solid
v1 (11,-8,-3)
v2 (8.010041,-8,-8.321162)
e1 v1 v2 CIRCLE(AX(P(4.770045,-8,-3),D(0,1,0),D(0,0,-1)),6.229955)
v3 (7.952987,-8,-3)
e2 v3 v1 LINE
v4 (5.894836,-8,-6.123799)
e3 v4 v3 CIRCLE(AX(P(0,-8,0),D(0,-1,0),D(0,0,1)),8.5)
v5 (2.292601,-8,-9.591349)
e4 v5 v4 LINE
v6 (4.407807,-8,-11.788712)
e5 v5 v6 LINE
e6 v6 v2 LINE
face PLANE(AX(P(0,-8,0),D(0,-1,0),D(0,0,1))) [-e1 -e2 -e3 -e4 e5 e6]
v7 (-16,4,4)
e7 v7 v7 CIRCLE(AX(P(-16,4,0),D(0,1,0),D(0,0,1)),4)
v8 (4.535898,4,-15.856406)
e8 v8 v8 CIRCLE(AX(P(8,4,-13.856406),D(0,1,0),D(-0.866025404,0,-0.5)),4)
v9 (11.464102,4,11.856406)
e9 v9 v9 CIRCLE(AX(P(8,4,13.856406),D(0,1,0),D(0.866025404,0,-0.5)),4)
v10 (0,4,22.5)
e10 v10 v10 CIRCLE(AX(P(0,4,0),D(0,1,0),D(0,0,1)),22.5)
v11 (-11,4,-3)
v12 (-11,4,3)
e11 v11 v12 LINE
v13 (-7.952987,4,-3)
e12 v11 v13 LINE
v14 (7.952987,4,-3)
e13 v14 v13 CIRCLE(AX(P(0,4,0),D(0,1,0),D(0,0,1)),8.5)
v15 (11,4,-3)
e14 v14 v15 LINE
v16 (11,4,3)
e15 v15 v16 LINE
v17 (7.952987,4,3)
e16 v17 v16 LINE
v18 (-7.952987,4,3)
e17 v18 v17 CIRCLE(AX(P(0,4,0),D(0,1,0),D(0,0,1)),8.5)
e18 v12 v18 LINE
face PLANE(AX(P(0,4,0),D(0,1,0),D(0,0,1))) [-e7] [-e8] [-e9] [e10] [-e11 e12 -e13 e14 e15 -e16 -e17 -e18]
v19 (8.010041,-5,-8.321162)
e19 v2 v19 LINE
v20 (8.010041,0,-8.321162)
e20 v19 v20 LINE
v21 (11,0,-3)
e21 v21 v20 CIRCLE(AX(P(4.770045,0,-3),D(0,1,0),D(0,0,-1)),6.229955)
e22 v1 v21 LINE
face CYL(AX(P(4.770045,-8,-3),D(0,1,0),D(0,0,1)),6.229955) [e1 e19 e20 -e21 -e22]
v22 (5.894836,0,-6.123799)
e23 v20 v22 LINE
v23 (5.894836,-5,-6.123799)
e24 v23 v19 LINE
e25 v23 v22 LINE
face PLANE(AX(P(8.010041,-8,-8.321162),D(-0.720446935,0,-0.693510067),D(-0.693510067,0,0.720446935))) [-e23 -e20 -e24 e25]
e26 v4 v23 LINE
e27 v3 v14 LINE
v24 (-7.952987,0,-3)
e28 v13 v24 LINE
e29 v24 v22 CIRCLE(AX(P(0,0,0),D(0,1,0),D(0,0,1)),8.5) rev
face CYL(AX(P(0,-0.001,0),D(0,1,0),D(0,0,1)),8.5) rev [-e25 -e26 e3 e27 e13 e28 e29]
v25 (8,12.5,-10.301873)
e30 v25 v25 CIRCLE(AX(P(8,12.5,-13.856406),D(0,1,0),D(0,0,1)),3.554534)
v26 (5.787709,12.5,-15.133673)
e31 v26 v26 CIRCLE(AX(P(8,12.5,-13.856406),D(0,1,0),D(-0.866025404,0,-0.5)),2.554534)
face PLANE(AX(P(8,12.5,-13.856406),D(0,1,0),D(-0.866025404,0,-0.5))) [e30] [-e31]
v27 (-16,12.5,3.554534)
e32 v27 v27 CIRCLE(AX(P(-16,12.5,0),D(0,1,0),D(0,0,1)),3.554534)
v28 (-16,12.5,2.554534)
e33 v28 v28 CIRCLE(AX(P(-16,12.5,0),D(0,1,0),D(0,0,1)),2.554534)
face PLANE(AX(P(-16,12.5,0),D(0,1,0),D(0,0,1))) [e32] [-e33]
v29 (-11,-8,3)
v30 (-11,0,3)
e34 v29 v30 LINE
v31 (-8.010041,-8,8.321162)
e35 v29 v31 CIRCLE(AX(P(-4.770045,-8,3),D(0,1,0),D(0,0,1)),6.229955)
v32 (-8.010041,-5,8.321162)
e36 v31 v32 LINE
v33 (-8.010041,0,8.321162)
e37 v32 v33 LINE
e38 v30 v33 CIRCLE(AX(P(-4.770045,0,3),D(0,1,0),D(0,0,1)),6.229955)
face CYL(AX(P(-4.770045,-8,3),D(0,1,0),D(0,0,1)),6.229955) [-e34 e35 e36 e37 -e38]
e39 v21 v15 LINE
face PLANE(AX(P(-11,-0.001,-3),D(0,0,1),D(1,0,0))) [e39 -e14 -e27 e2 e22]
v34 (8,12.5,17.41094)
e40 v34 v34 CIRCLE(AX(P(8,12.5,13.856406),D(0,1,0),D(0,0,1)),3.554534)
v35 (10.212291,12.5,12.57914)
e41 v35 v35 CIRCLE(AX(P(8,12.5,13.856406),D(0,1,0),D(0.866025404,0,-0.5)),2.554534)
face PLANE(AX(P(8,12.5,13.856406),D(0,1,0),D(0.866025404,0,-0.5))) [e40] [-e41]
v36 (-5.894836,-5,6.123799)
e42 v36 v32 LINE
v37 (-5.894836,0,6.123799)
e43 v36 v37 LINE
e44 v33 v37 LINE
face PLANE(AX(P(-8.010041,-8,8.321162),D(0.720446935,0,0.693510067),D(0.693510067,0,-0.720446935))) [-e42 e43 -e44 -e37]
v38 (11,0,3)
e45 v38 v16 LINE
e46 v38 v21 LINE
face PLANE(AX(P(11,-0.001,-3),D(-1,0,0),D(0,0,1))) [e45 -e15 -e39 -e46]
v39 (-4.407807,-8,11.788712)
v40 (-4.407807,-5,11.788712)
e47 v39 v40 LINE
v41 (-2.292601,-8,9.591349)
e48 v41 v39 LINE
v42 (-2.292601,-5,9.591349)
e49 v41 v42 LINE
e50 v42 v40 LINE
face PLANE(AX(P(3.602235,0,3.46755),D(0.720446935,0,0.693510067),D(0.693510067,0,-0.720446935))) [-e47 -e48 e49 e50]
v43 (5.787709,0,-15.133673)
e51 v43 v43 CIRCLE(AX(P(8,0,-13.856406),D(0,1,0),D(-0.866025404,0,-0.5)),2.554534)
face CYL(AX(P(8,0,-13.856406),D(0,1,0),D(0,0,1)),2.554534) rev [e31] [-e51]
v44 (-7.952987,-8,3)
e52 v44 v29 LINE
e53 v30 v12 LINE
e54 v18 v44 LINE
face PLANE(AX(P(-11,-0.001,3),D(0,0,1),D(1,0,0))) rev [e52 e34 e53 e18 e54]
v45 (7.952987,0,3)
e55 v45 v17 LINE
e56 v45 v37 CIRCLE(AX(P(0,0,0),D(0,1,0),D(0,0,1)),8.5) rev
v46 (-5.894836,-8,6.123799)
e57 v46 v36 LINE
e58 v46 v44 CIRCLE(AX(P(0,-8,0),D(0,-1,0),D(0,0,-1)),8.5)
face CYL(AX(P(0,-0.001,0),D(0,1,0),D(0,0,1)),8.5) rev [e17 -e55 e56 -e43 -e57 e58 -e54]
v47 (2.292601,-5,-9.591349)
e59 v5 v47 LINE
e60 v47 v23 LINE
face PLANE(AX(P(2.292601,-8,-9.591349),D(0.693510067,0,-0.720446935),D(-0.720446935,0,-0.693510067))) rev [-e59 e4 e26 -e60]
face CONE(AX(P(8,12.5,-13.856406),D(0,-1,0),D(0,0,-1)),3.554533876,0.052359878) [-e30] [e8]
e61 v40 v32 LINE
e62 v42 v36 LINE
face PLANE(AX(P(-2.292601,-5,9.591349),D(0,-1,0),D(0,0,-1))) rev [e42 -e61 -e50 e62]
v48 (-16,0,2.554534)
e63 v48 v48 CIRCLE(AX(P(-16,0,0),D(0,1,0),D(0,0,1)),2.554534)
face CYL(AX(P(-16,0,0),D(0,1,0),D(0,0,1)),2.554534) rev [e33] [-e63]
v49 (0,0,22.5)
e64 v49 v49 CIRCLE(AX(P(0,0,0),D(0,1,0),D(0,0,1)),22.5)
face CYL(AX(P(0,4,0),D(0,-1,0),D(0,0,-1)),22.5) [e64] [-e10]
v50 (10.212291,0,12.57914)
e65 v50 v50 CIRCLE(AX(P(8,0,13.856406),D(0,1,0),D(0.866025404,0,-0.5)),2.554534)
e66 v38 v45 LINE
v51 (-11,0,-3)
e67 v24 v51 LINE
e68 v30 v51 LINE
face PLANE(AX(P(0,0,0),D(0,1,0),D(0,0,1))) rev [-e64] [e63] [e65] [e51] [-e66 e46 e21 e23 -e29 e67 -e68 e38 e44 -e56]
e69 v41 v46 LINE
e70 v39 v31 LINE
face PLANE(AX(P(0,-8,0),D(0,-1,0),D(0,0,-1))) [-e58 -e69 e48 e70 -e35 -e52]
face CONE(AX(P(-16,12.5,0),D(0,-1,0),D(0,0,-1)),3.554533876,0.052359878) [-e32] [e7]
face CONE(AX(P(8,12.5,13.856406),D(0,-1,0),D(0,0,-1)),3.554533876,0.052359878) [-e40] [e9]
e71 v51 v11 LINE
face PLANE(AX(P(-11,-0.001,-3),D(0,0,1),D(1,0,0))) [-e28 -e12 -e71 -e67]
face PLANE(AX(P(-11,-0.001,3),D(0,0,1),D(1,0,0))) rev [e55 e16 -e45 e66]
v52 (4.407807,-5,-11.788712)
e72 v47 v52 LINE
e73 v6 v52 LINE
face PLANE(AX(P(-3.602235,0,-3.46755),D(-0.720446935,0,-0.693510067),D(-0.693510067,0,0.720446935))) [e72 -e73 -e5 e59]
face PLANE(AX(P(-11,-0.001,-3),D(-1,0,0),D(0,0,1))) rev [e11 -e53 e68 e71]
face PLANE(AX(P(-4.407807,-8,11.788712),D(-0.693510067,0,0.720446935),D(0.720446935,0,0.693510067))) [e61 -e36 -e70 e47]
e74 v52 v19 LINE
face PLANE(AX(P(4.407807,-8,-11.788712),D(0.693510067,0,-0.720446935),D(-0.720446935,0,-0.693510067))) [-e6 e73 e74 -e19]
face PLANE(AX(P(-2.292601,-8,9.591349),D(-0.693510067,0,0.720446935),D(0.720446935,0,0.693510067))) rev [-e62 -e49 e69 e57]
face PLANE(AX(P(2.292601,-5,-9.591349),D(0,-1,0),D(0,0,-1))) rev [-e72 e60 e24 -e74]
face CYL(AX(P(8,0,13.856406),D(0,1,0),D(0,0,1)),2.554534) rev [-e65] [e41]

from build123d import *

# Parameters (mm, degrees)
ESQUISSE1_R                                 = 22.5
BOSS_EXTRU_1_DEPTH                          = 4
ESQUISSE2_R                                 = 4
BOSS_EXTRU_3_DEPTH                          = 8.5
CHANFREIN1_SIZE                             = 8.5
CHANFREIN1_SIZE_2                           = 0.445466124
ESQUISSE4_R                                 = 2.554533876
ENL_V_MAT_EXTRU_1_DEPTH                     = 35.186985828
R_P_TITION_CIRCULAIRE1_COUNT                = 3
CHANFREIN1_OF_R_P_TITION_CIRCULAIRE1_SIZE   = 8.5
CHANFREIN1_OF_R_P_TITION_CIRCULAIRE1_SIZE_2 = 0.445466124
ENL_V_MAT_EXTRU_2_REACH                     = 34.936
ESQUISSE5_R                                 = 8.5
ENL_V_START                                 = -4
ESQUISSE6_W                                 = 22
ESQUISSE6_H                                 = 6
ENL_V_MAT_EXTRU_4_DEPTH                     = 4
BOSS_EXTRU_5_DEPTH                          = 8
ESQUISSE8_W                                 = 3.05
ESQUISSE8_H                                 = 3
BOSS_EXTRU_6_DEPTH                          = 5
R_P_TITION_CIRCULAIRE3_COUNT                = 2


with BuildPart() as part:
    # Esquisse1 → Boss.-Extru.1 (new body)
    with BuildSketch(Plane(origin=(0, 0, 0), x_dir=(1, 0, 0), z_dir=(0, 1, 0))):
        with Locations(Location((0, 0, 0), (0, 0, 270))):
            Circle(ESQUISSE1_R)
    extrude(amount=BOSS_EXTRU_1_DEPTH)

    # Esquisse2 → Boss.-Extru.3 (add)
    with BuildSketch(Plane(origin=(0, 4, 0), x_dir=(1, 0, 0), z_dir=(0, 1, 0))):
        with Locations(Location((-16, 0, 0), (0, 0, 270))):
            Circle(ESQUISSE2_R)
    boss_extru_3 = extrude(amount=BOSS_EXTRU_3_DEPTH)

    # Chanfrein1
    # the kernel refuses this chamfer: 8.5, 0.445466124 mm, written as the material it takes off along each edge
    with BuildSketch(Plane(origin=(-16, 12.5, 0), x_dir=(0, 0, 1), z_dir=(-1, 0, 0))) as chanfrein1_piece_1_section:
        Polygon((4, -CHANFREIN1_SIZE), (4 - CHANFREIN1_SIZE_2, 0), (4, 0), align=None)
    chanfrein1_piece_1 = revolve(axis=Axis((-16, 12.5, 0), (0, 1, 0)), mode=Mode.PRIVATE)
    chanfrein1_piece_1 = split(chanfrein1_piece_1, bisect_by=Plane(origin=(-16, 4, -3.812448858), z_dir=(0, 1, 0)), keep=Keep.TOP, mode=Mode.PRIVATE)
    add(chanfrein1_piece_1, mode=Mode.SUBTRACT)

    # Esquisse4 → Enlèv. mat.-Extru.1 (cut, through all)
    with BuildSketch(Plane(origin=(0, 12.5, 0), x_dir=(1, 0, 0), z_dir=(0, 1, 0))):
        with Locations(Location((-16, 0, 0), (0, 0, 270))):
            Circle(ESQUISSE4_R)
    enl_v_mat_extru_1 = extrude(amount=-ENL_V_MAT_EXTRU_1_DEPTH, mode=Mode.SUBTRACT)

    # Répétition circulaire1: Boss.-Extru.3, Enlèv. mat.-Extru.1 ×3 about axis
    r_p_tition_circulaire1_axis = Axis((0, 0, 0), (0, 1, 0))
    add([boss_extru_3.rotate(r_p_tition_circulaire1_axis, i * 360 / R_P_TITION_CIRCULAIRE1_COUNT) for i in range(1, R_P_TITION_CIRCULAIRE1_COUNT)])
    add([enl_v_mat_extru_1.rotate(r_p_tition_circulaire1_axis, i * 360 / R_P_TITION_CIRCULAIRE1_COUNT) for i in range(1, R_P_TITION_CIRCULAIRE1_COUNT)], mode=Mode.SUBTRACT)

    # Chanfrein1 of Répétition circulaire1
    # the kernel refuses this chamfer: 8.5, 0.445466124 mm, written as the material it takes off along each edge
    with BuildSketch(Plane(origin=(8, 12.5, 13.856406461), x_dir=(0.8660254037844387, 0, -0.5000000000000001), z_dir=(0.5000000000000001, 0, 0.8660254037844387))) as chanfrein1_of_r_p_tition_circulaire1_piece_1_section:
        Polygon((4, -CHANFREIN1_OF_R_P_TITION_CIRCULAIRE1_SIZE), (4 - CHANFREIN1_OF_R_P_TITION_CIRCULAIRE1_SIZE_2, 0), (4, 0), align=None)
    chanfrein1_of_r_p_tition_circulaire1_piece_1 = revolve(axis=Axis((8, 12.5, 13.856406461), (0, 1, 0)), mode=Mode.PRIVATE)
    chanfrein1_of_r_p_tition_circulaire1_piece_1 = split(chanfrein1_of_r_p_tition_circulaire1_piece_1, bisect_by=Plane(origin=(4.698322438, 4, 15.762630889), z_dir=(0, 1, 0)), keep=Keep.TOP, mode=Mode.PRIVATE)
    add(chanfrein1_of_r_p_tition_circulaire1_piece_1, mode=Mode.SUBTRACT)
    with BuildSketch(Plane(origin=(8, 12.5, -13.856406461), x_dir=(-0.8660254037844384, 0, -0.5000000000000003), z_dir=(0.5000000000000003, 0, -0.8660254037844384))) as chanfrein1_of_r_p_tition_circulaire1_piece_2_section:
        Polygon((4, -CHANFREIN1_OF_R_P_TITION_CIRCULAIRE1_SIZE), (4 - CHANFREIN1_OF_R_P_TITION_CIRCULAIRE1_SIZE_2, 0), (4, 0), align=None)
    chanfrein1_of_r_p_tition_circulaire1_piece_2 = revolve(axis=Axis((8, 12.5, -13.856406461), (0, 1, 0)), mode=Mode.PRIVATE)
    chanfrein1_of_r_p_tition_circulaire1_piece_2 = split(chanfrein1_of_r_p_tition_circulaire1_piece_2, bisect_by=Plane(origin=(11.301677562, 4, -11.950182032), z_dir=(0, 1, 0)), keep=Keep.TOP, mode=Mode.PRIVATE)
    add(chanfrein1_of_r_p_tition_circulaire1_piece_2, mode=Mode.SUBTRACT)

    # Esquisse5 → Enlèv. mat.-Extru.2 (cut, up to next)
    with BuildSketch(Plane(origin=(0, 4, 0), x_dir=(1, 0, 0), z_dir=(0, 1, 0)), mode=Mode.PRIVATE) as enl_v_mat_extru_2_sk1:
        with Locations(Location((0, 0, 0), (0, 0, 270))):
            Circle(ESQUISSE5_R)
    enl_v_mat_extru_2_tool1 = extrude(enl_v_mat_extru_2_sk1.sketch, amount=-ENL_V_MAT_EXTRU_2_REACH, mode=Mode.PRIVATE) & part.part
    add(enl_v_mat_extru_2_tool1.solids().sort_by_distance((0, 4, 0))[0], mode=Mode.SUBTRACT)

    # Esquisse6 → Enlèv. mat.-Extru.4 (cut)
    with BuildSketch(Plane(origin=(0, 4, 0), x_dir=(1, 0, 0), z_dir=(0, 1, 0)).offset(ENL_V_START)):
        Rectangle(ESQUISSE6_W, ESQUISSE6_H)
    extrude(amount=ENL_V_MAT_EXTRU_4_DEPTH, mode=Mode.SUBTRACT)

    # Esquisse7 → Boss.-Extru.5 (add)
    with BuildSketch(Plane(origin=(0, 0, 0), x_dir=(1, 0, 0), z_dir=(0, 1, 0))):
        with BuildLine():
            Line((-7.95298686, -3), (-11, -3))
            ThreePointArc((-11, -3), (-10.201314207, -6.051828113), (-8.010041275, -8.321162104))
            Line((-8.010041275, -8.321162104), (-5.894835571, -6.123798951))
            ThreePointArc((-5.894835571, -6.123798951), (-7.097892398, -4.676529002), (-7.95298686, -3))
        make_face()
    boss_extru_5 = extrude(amount=-BOSS_EXTRU_5_DEPTH)

    # Esquisse8 → Boss.-Extru.6 (add)
    with BuildSketch(Plane(origin=(0, 0, 0), x_dir=(0.6935100671316063, 0, -0.7204469354415458), z_dir=(0.7204469354415458, 0, 0.6935100671316063))):
        with Locations((-10.025, -6.5)):
            Rectangle(ESQUISSE8_W, ESQUISSE8_H)
    boss_extru_6 = extrude(amount=BOSS_EXTRU_6_DEPTH)

    # Répétition circulaire3: Boss.-Extru.5, Boss.-Extru.6 ×2 about axis
    r_p_tition_circulaire3_axis = Axis((0, 0, 0), (0, 1, 0))
    add([boss_extru_5.rotate(r_p_tition_circulaire3_axis, i * 360 / R_P_TITION_CIRCULAIRE3_COUNT) for i in range(1, R_P_TITION_CIRCULAIRE3_COUNT)])
    add([boss_extru_6.rotate(r_p_tition_circulaire3_axis, i * 360 / R_P_TITION_CIRCULAIRE3_COUNT) for i in range(1, R_P_TITION_CIRCULAIRE3_COUNT)])


solid = part.part
